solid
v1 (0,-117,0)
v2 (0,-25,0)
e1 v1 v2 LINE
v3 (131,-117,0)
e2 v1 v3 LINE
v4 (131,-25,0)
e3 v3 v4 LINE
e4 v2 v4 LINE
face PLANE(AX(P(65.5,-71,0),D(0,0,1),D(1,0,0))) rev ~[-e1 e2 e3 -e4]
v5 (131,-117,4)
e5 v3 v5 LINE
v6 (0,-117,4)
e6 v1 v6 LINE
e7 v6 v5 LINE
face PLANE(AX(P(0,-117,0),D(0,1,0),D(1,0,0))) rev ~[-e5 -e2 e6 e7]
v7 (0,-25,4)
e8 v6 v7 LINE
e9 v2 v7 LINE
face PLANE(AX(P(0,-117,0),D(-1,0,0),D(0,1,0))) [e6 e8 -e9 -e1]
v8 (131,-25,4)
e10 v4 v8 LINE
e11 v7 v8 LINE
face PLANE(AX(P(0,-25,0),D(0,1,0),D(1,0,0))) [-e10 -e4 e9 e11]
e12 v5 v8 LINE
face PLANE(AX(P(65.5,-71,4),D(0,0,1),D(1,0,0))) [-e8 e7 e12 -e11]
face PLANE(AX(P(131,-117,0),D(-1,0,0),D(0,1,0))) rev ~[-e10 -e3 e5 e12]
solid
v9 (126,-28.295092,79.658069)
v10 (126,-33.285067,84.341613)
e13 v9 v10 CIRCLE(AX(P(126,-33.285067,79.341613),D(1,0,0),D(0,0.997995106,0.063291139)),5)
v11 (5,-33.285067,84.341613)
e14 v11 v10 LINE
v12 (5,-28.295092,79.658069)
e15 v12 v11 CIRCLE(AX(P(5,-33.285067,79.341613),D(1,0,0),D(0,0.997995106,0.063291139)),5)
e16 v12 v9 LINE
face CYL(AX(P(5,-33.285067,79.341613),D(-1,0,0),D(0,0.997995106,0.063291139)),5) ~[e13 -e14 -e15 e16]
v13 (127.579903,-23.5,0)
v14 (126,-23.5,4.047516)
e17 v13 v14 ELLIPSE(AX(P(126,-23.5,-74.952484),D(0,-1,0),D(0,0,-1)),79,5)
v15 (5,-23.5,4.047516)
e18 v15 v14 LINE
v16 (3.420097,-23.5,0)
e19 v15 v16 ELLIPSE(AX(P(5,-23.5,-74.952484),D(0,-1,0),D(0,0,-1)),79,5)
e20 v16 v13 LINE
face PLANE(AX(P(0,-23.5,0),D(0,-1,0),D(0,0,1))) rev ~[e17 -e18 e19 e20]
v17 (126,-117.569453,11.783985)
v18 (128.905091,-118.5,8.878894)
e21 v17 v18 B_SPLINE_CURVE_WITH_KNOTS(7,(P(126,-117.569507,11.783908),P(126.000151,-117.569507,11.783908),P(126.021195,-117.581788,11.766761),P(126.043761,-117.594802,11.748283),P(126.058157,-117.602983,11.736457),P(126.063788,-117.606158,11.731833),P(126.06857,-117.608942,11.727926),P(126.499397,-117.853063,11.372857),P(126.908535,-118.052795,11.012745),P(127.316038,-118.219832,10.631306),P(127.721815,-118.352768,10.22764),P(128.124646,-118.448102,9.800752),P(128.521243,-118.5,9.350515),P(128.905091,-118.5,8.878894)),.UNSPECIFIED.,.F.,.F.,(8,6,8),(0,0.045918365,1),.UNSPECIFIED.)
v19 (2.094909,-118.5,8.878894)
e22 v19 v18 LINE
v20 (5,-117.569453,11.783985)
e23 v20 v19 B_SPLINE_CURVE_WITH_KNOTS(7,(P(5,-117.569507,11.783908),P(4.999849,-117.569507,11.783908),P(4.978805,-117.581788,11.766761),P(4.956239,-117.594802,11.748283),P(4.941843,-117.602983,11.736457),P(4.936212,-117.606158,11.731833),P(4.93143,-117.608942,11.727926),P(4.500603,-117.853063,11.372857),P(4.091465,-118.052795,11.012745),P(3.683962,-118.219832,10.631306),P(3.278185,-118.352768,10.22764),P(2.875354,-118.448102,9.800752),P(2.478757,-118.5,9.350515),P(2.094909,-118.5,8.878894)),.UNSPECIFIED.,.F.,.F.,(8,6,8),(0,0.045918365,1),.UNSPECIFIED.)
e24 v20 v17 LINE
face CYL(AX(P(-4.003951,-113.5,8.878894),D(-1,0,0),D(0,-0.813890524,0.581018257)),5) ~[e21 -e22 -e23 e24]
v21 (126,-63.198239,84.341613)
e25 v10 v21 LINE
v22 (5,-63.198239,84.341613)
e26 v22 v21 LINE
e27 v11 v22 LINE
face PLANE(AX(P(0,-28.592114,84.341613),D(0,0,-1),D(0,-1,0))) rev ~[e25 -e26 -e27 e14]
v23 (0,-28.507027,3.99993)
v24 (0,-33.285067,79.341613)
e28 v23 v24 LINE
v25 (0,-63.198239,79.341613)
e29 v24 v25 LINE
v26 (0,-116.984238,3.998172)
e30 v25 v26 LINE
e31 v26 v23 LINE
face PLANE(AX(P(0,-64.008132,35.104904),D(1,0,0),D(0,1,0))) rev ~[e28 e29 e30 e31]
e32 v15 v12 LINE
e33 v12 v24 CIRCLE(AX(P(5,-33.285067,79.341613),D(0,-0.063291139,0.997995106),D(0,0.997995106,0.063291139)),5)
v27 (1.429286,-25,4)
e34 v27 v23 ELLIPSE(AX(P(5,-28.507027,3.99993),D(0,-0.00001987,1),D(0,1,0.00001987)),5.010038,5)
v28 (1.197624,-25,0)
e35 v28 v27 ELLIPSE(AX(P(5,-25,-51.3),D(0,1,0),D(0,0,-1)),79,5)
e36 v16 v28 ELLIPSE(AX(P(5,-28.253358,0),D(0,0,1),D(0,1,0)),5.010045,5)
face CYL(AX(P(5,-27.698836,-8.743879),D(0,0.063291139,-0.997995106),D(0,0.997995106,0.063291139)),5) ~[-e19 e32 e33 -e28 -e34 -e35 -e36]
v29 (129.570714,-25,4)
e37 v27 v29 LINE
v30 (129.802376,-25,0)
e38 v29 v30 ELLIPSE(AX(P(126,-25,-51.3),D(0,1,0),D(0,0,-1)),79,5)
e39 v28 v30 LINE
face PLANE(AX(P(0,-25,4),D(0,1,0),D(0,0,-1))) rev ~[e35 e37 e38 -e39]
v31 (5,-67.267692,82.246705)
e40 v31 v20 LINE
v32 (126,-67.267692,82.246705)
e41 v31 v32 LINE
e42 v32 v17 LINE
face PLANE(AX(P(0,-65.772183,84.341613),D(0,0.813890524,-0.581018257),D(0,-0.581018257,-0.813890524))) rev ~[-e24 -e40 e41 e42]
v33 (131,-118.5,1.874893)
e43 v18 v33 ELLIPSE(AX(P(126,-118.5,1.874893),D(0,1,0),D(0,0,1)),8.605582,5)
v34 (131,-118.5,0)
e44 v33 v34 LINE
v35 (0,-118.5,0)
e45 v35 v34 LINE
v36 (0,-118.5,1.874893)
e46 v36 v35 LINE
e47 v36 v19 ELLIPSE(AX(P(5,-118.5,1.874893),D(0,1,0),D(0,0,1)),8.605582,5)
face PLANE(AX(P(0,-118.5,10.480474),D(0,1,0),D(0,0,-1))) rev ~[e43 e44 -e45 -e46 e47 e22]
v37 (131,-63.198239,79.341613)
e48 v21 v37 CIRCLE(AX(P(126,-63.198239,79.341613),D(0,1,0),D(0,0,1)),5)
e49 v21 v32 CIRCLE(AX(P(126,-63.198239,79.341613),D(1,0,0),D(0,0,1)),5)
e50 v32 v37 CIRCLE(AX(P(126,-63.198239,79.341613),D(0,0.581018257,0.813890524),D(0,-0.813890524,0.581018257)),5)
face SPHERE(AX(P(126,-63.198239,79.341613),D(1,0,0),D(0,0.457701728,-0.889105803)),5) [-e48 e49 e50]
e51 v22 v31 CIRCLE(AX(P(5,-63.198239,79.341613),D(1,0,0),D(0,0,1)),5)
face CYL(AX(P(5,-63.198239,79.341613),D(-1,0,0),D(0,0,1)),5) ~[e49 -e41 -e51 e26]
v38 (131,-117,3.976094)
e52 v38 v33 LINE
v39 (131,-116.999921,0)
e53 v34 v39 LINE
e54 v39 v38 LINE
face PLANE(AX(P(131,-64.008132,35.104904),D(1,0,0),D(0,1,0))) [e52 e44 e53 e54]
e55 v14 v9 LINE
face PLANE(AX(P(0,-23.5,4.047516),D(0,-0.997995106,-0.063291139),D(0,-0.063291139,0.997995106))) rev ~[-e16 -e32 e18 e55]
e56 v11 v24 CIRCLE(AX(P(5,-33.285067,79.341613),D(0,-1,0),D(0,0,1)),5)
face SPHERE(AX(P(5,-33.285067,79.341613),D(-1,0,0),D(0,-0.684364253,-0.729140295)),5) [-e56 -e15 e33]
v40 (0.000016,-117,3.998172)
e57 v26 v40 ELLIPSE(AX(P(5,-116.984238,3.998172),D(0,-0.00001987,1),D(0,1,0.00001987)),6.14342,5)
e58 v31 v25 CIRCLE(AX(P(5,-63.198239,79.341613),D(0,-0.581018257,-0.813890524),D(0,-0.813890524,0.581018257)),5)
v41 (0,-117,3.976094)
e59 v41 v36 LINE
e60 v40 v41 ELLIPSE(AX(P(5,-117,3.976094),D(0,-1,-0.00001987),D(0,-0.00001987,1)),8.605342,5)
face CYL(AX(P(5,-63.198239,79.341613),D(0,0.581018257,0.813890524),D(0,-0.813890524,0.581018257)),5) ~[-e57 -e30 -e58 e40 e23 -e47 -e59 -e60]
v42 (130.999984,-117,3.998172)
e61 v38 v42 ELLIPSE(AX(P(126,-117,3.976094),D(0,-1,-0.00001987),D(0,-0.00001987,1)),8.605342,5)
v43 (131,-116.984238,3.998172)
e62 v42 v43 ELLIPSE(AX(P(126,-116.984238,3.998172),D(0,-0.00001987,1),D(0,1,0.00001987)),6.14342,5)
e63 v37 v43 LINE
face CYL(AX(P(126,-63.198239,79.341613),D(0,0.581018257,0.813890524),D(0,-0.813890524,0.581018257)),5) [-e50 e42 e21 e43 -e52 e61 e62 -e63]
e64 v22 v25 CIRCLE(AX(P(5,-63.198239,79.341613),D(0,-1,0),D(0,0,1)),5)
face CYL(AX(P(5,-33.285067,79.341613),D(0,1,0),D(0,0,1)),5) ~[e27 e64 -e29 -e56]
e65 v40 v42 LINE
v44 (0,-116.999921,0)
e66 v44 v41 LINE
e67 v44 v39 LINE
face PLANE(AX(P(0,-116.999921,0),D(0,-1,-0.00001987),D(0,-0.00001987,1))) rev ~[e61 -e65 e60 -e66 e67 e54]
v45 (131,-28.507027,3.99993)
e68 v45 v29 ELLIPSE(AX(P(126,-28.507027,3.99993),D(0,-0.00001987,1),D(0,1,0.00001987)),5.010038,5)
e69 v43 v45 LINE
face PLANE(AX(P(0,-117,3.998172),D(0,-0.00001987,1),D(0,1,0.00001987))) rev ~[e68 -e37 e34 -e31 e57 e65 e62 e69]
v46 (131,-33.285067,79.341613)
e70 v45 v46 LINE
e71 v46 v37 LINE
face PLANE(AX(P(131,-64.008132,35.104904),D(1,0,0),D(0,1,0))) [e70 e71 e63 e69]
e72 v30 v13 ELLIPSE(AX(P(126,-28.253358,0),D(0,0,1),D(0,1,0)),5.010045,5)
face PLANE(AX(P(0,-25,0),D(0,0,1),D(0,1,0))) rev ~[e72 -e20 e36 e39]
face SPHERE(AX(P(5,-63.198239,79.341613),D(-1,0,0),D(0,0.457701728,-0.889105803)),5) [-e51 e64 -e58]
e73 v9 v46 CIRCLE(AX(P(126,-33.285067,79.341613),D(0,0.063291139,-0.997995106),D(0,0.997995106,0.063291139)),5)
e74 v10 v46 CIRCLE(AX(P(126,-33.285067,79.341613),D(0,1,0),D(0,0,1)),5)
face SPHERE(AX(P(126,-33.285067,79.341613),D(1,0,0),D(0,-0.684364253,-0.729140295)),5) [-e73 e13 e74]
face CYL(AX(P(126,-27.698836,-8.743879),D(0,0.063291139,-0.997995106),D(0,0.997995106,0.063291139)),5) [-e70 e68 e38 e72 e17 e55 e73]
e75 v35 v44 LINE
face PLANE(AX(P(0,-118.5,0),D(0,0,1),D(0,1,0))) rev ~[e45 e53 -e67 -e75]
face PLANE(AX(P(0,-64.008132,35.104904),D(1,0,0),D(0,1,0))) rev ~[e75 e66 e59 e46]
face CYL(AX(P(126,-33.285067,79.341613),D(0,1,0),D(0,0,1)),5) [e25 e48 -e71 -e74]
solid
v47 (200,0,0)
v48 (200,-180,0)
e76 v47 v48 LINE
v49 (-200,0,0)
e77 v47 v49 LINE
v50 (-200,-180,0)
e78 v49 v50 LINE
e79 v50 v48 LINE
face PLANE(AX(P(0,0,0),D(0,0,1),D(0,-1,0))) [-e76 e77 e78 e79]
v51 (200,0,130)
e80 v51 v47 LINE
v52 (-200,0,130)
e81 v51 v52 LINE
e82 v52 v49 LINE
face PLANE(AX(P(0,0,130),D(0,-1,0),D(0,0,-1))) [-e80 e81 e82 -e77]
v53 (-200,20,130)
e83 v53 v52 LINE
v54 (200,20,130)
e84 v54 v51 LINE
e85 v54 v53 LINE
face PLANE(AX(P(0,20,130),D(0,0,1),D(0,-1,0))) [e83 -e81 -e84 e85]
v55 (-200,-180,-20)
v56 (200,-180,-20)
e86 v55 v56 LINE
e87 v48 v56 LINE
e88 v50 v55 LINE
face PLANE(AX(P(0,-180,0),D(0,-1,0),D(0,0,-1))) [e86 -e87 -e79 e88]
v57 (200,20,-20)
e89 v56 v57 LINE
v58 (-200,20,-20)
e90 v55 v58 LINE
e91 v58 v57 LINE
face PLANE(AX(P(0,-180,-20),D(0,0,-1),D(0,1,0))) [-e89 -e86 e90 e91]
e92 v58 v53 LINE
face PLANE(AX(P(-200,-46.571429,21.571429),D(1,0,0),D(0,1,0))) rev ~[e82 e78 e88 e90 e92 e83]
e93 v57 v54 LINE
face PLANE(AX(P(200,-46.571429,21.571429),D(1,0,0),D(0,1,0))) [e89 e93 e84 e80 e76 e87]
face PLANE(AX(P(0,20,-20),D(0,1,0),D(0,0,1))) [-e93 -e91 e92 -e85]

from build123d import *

# Parameters (mm, degrees)
F1_DEPTH     = 200
F2_W         = 131
F2_H         = 92
F3_DEPTH     = 4
F5_DEPTH     = 131
F6_T1_DEPTH  = 100.6767614544
F6_T3_DEPTH  = 139.007901378
F6_T5_DEPTH  = 121
F6_T7_DEPTH  = 88.2624487626
F6_T9_DEPTH  = 29.9131719037
F6_T14_DEPTH = 5
F6_T20_DEPTH = 5
F6_T26_DEPTH = 5
F6_T32_DEPTH = 5


# Not quite as in the source:
# - a fillet or chamfer that OpenCascade refuses, or shapes differently, is made with other operations: its cross-section is extruded or revolved along the edge and cut away or added
# - two fillets or chamfers of one size are made in one step


with BuildPart() as f1:
    # F0 (on Right) → F1 (new body, symmetric)
    with BuildSketch(Plane.YZ):
        Polygon((0, 0), (-180, 0), (-180, -20), (20, -20), (20, 130), (0, 130), align=None)
    extrude(amount=F1_DEPTH, both=True)


with BuildPart() as f3:
    # F2 (on face) → F3 (new body)
    with BuildSketch(Plane.XY):
        with Locations((65.5, -71)):
            Rectangle(F2_W, F2_H)
    extrude(amount=F3_DEPTH)


with BuildPart() as f5:
    # F4 (on Right) → F5 (new body, through all)
    with BuildSketch(Plane.YZ):
        Polygon((-117, 3.9981720038), (-25, 4), (-25, 0), (-23.5, 0), (-23.5, 4.0475159867), (-28.5921140468, 84.3416133777), (-65.772183231, 84.3416133777), (-118.5, 10.4804740827), (-118.5, 0), (-116.9999205582, 0), align=None)
    extrude(amount=F5_DEPTH)

    # F6: fillet of radius 5 on 9 edges, made by hand

    # F6_s2 → F6_t1 (cut)
    with BuildSketch(Plane(origin=(0, 16.184877417, 22.6717804496), x_dir=(1, 0, 0), z_dir=(0, -0.581018257, -0.8138905239))):
        with BuildLine():
            ThreePointArc((5, 102.5353738726), (1.4644660941, 101.0709077785), (0, 97.5353738726))
            Line((0, 97.5353738726), (0, 102.5353738726))
            Line((0, 102.5353738726), (5, 102.5353738726))
        make_face()
        with BuildLine():
            ThreePointArc((126, 102.5353738726), (129.5355339059, 101.0709077785), (131, 97.5353738726))
            Line((131, 97.5353738726), (131, 102.5353738726))
            Line((131, 102.5353738726), (126, 102.5353738726))
        make_face()
    extrude(amount=F6_T1_DEPTH, mode=Mode.SUBTRACT)

    # F6_s4 → F6_t3 (cut)
    with BuildSketch(Plane.YZ.offset(-4.003950689)):
        with BuildLine():
            ThreePointArc((-117.5694526197, 11.7839850923), (-118.2616836885, 10.4041375419), (-118.5, 8.8788938071))
            Line((-118.5, 8.8788938071), (-118.5, 10.4804740827))
            Line((-118.5, 10.4804740827), (-117.5694526197, 11.7839850923))
        make_face()
    extrude(amount=F6_T3_DEPTH, mode=Mode.SUBTRACT)

    # F6_s6 → F6_t5 (cut)
    with BuildSketch(Plane.YZ.offset(5)):
        with BuildLine():
            ThreePointArc((-63.1982391278, 84.3416133777), (-65.4867477659, 83.7871423916), (-67.2676917475, 82.246704663))
            Line((-67.2676917475, 82.246704663), (-65.772183231, 84.3416133777))
            Line((-65.772183231, 84.3416133777), (-63.1982391278, 84.3416133777))
        make_face()
        with BuildLine():
            ThreePointArc((-28.2950916938, 79.6580690739), (-29.8632459605, 82.9873148521), (-33.2850672241, 84.3416133777))
            Line((-33.2850672241, 84.3416133777), (-28.5921140468, 84.3416133777))
            Line((-28.5921140468, 84.3416133777), (-28.2950916938, 79.6580690739))
        make_face()
    extrude(amount=F6_T5_DEPTH, mode=Mode.SUBTRACT)

    # F6_s8 → F6_t7 (cut)
    with BuildSketch(Plane(origin=(0, 0.4413453849, -6.9592764405), x_dir=(1, 0, 0), z_dir=(0, -0.0632911392, 0.997995106))):
        with BuildLine():
            ThreePointArc((5, -23.1967130942), (1.4644660941, -24.6611791883), (0, -28.1967130942))
            Line((0, -28.1967130942), (0, -23.1967130942))
            Line((0, -23.1967130942), (5, -23.1967130942))
        make_face()
        with BuildLine():
            ThreePointArc((126, -23.1967130942), (129.5355339059, -24.6611791883), (131, -28.1967130942))
            Line((131, -28.1967130942), (131, -23.1967130942))
            Line((131, -23.1967130942), (126, -23.1967130942))
        make_face()
    extrude(amount=F6_T7_DEPTH, mode=Mode.SUBTRACT)

    # F6_s10 → F6_t9 (cut)
    with BuildSketch(Plane.XZ.offset(33.2850672241)):
        with BuildLine():
            ThreePointArc((5, 84.3416133777), (1.4644660941, 82.8771472836), (0, 79.3416133777))
            Line((0, 79.3416133777), (0, 84.3416133777))
            Line((0, 84.3416133777), (5, 84.3416133777))
        make_face()
        with BuildLine():
            ThreePointArc((126, 84.3416133777), (129.5355339059, 82.8771472836), (131, 79.3416133777))
            Line((131, 79.3416133777), (131, 84.3416133777))
            Line((131, 84.3416133777), (126, 84.3416133777))
        make_face()
    extrude(amount=F6_T9_DEPTH, mode=Mode.SUBTRACT)


with BuildPart() as f6_tool12:
    # F6_s13 → F6_t14 (new body)
    with BuildSketch(Plane.YZ.offset(5)):
        Polygon((-63.1982391278, 79.3416133777), (-63.1982391278, 84.3416133777), (-65.772183231, 84.3416133777), (-67.2676917475, 82.246704663), align=None)
    extrude(amount=-F6_T14_DEPTH)

    # F6_s15 → F6_t16 (revolve, cut)
    with BuildSketch(Plane(origin=(5, -63.1982391278, 79.3416133777), x_dir=(0, 0.4577017276, -0.8891058028), z_dir=(0, 0.8891058028, 0.4577017276))):
        with BuildLine():
            ThreePointArc((0, -5), (5, 0), (0, 5))
            Line((0, 5), (0, -5))
        make_face()
    revolve(axis=Axis((5, -63.1982391278, 79.3416133777), (-1, 0, 0)), mode=Mode.SUBTRACT)


with BuildPart() as f5_1:
    add(f5.part)

    # F6_t11: cut F6_tool12
    add(f6_tool12.part, mode=Mode.SUBTRACT)


with BuildPart() as f6_tool18:
    # F6_s19 → F6_t20 (new body)
    with BuildSketch(Plane.YZ.offset(126)):
        Polygon((-63.1982391278, 79.3416133777), (-63.1982391278, 84.3416133777), (-65.772183231, 84.3416133777), (-67.2676917475, 82.246704663), align=None)
    extrude(amount=F6_T20_DEPTH)

    # F6_s21 → F6_t22 (revolve, cut)
    with BuildSketch(Plane(origin=(126, -63.1982391278, 79.3416133777), x_dir=(0, 0.4577017276, -0.8891058028), z_dir=(0, -0.8891058028, -0.4577017276))):
        with BuildLine():
            ThreePointArc((0, -5), (5, 0), (0, 5))
            Line((0, 5), (0, -5))
        make_face()
    revolve(axis=Axis((126, -63.1982391278, 79.3416133777), (1, 0, 0)), mode=Mode.SUBTRACT)


with BuildPart() as f5_2:
    add(f5_1.part)

    # F6_t17: cut F6_tool18
    add(f6_tool18.part, mode=Mode.SUBTRACT)


with BuildPart() as f6_tool24:
    # F6_s25 → F6_t26 (new body)
    with BuildSketch(Plane.YZ.offset(5)):
        Polygon((-33.2850672241, 79.3416133777), (-28.2950916938, 79.6580690739), (-28.5921140468, 84.3416133777), (-33.2850672241, 84.3416133777), align=None)
    extrude(amount=-F6_T26_DEPTH)

    # F6_s27 → F6_t28 (revolve, cut)
    with BuildSketch(Plane(origin=(5, -33.2850672241, 79.3416133777), x_dir=(0, -0.6843642527, -0.7291402949), z_dir=(0, 0.7291402949, -0.6843642527))):
        with BuildLine():
            ThreePointArc((0, -5), (5, 0), (0, 5))
            Line((0, 5), (0, -5))
        make_face()
    revolve(axis=Axis((5, -33.2850672241, 79.3416133777), (-1, 0, 0)), mode=Mode.SUBTRACT)


with BuildPart() as f5_3:
    add(f5_2.part)

    # F6_t23: cut F6_tool24
    add(f6_tool24.part, mode=Mode.SUBTRACT)


with BuildPart() as f6_tool30:
    # F6_s31 → F6_t32 (new body)
    with BuildSketch(Plane.YZ.offset(126)):
        Polygon((-33.2850672241, 79.3416133777), (-28.2950916938, 79.6580690739), (-28.5921140468, 84.3416133777), (-33.2850672241, 84.3416133777), align=None)
    extrude(amount=F6_T32_DEPTH)

    # F6_s33 → F6_t34 (revolve, cut)
    with BuildSketch(Plane(origin=(126, -33.2850672241, 79.3416133777), x_dir=(0, -0.6843642527, -0.7291402949), z_dir=(0, -0.7291402949, 0.6843642527))):
        with BuildLine():
            ThreePointArc((0, -5), (5, 0), (0, 5))
            Line((0, 5), (0, -5))
        make_face()
    revolve(axis=Axis((126, -33.2850672241, 79.3416133777), (1, 0, 0)), mode=Mode.SUBTRACT)


with BuildPart() as f5_4:
    add(f5_3.part)

    # F6_t29: cut F6_tool30
    add(f6_tool30.part, mode=Mode.SUBTRACT)


solid = Compound([f1.part, f3.part, f5_4.part])
